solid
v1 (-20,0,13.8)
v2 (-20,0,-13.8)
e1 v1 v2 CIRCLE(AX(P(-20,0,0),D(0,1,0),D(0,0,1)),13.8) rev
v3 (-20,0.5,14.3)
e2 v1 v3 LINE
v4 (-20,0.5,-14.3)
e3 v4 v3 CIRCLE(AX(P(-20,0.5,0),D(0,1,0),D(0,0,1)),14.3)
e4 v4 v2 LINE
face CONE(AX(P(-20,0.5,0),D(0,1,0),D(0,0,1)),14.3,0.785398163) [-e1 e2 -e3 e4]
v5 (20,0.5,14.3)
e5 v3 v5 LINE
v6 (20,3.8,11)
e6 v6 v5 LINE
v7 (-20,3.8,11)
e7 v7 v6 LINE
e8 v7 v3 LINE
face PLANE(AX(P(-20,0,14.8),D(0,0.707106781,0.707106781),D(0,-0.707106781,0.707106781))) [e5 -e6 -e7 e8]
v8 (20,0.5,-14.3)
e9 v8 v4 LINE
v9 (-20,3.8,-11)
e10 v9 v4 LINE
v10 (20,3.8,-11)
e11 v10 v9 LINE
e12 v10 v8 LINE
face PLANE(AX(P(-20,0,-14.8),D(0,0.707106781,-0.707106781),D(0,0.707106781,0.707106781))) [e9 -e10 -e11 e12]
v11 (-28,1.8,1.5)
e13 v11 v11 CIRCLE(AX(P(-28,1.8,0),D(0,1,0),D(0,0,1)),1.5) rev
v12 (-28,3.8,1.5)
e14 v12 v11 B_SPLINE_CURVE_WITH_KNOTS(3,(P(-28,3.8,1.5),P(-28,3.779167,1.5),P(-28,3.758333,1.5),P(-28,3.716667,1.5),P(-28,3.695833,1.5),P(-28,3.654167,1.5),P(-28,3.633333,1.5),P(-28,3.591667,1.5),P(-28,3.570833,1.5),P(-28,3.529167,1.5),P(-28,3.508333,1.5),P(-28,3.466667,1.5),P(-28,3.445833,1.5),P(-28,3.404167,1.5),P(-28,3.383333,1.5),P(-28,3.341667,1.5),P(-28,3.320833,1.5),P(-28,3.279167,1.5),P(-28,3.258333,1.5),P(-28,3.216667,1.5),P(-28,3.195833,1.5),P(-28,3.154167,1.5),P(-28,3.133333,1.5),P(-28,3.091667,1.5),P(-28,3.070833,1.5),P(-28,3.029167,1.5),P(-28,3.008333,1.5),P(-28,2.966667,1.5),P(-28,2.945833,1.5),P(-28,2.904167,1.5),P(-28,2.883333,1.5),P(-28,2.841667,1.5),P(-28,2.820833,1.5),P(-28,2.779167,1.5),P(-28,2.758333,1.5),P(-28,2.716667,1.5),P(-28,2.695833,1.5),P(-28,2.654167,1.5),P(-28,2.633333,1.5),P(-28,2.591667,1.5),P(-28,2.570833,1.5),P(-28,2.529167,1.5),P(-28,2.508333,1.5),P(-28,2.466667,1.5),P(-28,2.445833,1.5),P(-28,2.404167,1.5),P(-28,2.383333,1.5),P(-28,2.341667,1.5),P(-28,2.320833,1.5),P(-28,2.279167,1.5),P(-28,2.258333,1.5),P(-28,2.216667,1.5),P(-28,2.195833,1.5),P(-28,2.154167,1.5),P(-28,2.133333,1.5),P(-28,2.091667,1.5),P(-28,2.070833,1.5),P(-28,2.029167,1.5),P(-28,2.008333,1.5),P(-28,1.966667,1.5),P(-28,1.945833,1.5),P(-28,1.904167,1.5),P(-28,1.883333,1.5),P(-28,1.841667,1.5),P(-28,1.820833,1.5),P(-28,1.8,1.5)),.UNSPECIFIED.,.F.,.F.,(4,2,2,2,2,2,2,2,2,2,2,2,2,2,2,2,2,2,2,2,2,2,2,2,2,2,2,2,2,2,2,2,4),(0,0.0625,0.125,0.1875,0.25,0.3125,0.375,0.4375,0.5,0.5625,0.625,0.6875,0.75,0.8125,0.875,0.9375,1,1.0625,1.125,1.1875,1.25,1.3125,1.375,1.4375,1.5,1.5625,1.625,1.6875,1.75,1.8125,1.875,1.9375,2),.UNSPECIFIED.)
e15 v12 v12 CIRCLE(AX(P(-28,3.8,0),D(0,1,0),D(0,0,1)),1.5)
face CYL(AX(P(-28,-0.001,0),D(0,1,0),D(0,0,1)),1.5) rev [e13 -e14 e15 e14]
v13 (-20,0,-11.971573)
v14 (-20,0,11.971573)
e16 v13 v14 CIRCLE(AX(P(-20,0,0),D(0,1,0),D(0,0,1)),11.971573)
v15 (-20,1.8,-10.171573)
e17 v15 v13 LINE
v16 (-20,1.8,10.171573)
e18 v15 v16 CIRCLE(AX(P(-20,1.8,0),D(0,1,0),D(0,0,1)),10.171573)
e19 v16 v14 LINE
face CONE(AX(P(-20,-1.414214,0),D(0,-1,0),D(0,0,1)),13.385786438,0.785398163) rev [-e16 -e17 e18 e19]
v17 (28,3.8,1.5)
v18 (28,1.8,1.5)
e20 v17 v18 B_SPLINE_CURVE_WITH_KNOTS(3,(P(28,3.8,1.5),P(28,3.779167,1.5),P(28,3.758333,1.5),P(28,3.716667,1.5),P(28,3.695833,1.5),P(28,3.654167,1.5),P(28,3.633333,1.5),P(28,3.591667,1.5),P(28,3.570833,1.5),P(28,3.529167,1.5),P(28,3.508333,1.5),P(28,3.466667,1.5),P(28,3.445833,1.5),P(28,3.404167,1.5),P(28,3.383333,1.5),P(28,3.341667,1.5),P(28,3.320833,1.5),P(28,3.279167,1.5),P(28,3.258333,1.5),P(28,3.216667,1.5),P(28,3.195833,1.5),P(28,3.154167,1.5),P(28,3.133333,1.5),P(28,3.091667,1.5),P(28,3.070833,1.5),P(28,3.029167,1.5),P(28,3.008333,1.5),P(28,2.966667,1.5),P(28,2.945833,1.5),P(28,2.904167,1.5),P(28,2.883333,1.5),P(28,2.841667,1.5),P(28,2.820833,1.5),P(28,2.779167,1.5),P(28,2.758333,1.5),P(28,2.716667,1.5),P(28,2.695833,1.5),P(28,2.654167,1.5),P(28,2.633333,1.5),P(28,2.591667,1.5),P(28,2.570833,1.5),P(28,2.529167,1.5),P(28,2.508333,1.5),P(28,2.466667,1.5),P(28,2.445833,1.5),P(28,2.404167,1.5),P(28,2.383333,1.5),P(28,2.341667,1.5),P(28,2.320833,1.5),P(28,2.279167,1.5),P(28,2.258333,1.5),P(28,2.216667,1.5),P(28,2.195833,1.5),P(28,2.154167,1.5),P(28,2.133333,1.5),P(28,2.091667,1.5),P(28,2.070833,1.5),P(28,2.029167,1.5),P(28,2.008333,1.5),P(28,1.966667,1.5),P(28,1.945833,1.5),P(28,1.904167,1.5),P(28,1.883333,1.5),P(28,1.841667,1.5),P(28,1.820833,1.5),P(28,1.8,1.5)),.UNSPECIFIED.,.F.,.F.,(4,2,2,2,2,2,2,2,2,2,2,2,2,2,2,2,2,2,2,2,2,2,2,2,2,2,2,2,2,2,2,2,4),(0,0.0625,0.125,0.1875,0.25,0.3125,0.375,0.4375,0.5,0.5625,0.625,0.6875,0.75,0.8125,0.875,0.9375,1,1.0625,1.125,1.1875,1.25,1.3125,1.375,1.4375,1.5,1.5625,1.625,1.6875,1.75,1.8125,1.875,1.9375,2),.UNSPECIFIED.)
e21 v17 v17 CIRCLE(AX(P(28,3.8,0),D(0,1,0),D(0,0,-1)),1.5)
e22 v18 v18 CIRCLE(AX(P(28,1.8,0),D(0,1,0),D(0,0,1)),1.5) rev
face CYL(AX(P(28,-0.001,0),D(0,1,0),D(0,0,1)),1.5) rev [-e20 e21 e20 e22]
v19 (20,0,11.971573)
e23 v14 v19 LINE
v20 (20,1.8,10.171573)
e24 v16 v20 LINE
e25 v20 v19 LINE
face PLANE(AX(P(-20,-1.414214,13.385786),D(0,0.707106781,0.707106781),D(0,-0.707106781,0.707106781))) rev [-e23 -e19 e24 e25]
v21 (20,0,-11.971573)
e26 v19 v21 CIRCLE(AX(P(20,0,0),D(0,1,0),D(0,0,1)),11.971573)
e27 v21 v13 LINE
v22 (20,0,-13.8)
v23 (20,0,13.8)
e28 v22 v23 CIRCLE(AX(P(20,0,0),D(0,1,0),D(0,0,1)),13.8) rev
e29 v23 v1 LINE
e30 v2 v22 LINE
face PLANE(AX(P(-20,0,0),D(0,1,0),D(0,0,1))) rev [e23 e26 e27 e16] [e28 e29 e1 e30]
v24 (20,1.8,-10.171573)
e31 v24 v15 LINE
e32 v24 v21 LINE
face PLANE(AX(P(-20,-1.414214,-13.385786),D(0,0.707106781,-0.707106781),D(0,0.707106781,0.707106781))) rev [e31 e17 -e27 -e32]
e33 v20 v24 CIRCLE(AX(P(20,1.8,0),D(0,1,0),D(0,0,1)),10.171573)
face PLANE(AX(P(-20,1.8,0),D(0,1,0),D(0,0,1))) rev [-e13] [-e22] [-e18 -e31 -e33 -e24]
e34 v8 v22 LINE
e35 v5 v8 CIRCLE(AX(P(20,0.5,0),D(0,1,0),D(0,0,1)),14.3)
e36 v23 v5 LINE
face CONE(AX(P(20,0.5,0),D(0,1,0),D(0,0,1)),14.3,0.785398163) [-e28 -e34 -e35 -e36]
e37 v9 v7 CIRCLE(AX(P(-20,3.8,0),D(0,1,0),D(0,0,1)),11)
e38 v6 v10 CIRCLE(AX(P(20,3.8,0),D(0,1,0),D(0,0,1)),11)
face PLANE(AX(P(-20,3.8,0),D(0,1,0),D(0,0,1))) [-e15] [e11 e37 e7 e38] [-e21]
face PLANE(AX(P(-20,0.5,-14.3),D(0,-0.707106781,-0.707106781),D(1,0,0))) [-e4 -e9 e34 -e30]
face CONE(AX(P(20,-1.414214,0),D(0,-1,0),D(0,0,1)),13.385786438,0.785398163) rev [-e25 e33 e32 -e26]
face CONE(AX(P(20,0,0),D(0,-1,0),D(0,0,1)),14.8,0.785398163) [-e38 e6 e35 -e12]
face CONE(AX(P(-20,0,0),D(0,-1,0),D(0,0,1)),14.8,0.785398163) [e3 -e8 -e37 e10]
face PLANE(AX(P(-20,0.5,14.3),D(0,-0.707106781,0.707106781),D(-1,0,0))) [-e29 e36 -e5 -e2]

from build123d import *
from OCP.BRepFilletAPI import BRepFilletAPI_MakeChamfer

# Parameters (mm, degrees)
BOSS_EXTRU_1_DEPTH      = 3.8
BOSS_EXTRU_1_TAPER      = 45
COQUE2_DEPTH            = 1.8
COQUE2_DRAFT            = 45
CHANFREIN1_SIZE         = 1
CHANFREIN1_SIZE2        = 0.707106781
ENL_V_MAT_EXTRU_1_REACH = 39.355
ESQUISSE2_R             = 1.5


# Read off the part's stored shape, not the designer's step: Coque2
with BuildPart() as part:
    # Esquisse1 → Boss.-Extru.1 (new body)
    with BuildSketch(Plane(origin=(0, 0, 0), x_dir=(1, 0, 0), z_dir=(0, 1, 0))):
        with BuildLine():
            ThreePointArc((-20, 14.8), (-34.8, 0), (-20, -14.8))
            Line((-20, -14.8), (20, -14.8))
            ThreePointArc((20, -14.8), (34.8, 0), (20, 14.8))
            Line((20, 14.8), (-20, 14.8))
        make_face()
    extrude(amount=BOSS_EXTRU_1_DEPTH, taper=BOSS_EXTRU_1_TAPER)


with BuildPart() as coque2_tool:
    # Coque2 outline → Coque2 (with draft: the straight prism first)
    with BuildSketch(Plane(origin=(0, 1.8, 0), x_dir=(1, 0, 0), z_dir=(0, 1, 0))):
        with BuildLine():
            Line((-20, -10.171572875), (20, -10.171572875))
            ThreePointArc((20, -10.171572875), (30.171572875, 0), (20, 10.171572875))
            Line((20, 10.171572875), (-20, 10.171572875))
            ThreePointArc((-20, 10.171572875), (-30.171572875, 0), (-20, -10.171572875))
        make_face()
    extrude(amount=-COQUE2_DEPTH)
    # Coque2: the draft: its side faces are tilted about the plane it starts from
    coque2_sides = [coque2_tool.faces().sort_by_distance(p)[0] for p in [
        (0, 0.9, 10.171572875),
        (30.171572875, 0.9, 0),
        (0, 0.9, -10.171572875),
        (-30.171572875, 0.9, 0),
    ]]
    draft(coque2_sides, Plane(origin=(0, 1.8, 0), x_dir=(1, 0, 0), z_dir=(0, 1, 0)), COQUE2_DRAFT)


with BuildPart() as part_1:
    add(part.part)

    # Coque2: cut by coque2_tool
    add(coque2_tool.part, mode=Mode.SUBTRACT)

    # Chanfrein1: one chamfer whose edges measure the first distance from different faces: ONE call of the kernel's chamfer builder (chamfer() names one face for all edges)
    chanfrein1_edges_1 = [part_1.edges().sort_by_distance(p)[0] for p in [
        (0, 0, -14.8),
        (0, 0, 14.8),
        (-34.8, 0, 0),
    ]]
    chanfrein1_side_1 = [part_1.faces().sort_by_distance(p)[0] for p in [
        (0, 0, -14.043672029),
    ]]
    chanfrein1_edges_2 = [part_1.edges().sort_by_distance(p)[0] for p in [
        (34.8, 0, 0),
    ]]
    chanfrein1_side_2 = [part_1.faces().sort_by_distance(p)[0] for p in [
        (32.9, 1.9, 0),
    ]]
    chanfrein1 = BRepFilletAPI_MakeChamfer(part_1.part.solid().wrapped)
    for e in chanfrein1_edges_1:
        chanfrein1.Add(CHANFREIN1_SIZE, CHANFREIN1_SIZE2, e.wrapped, chanfrein1_side_1[0].wrapped)  # the first distance lies on this face
    for e in chanfrein1_edges_2:
        chanfrein1.Add(CHANFREIN1_SIZE, CHANFREIN1_SIZE2, e.wrapped, chanfrein1_side_2[0].wrapped)  # the first distance lies on this face
    add(Compound.cast(chanfrein1.Shape()), mode=Mode.REPLACE)

    # Esquisse2 → Enlèv. mat.-Extru.1 (cut, up to next)
    with BuildSketch(Plane(origin=(0, 3.8, 0), x_dir=(1, 0, 0), z_dir=(0, 1, 0)), mode=Mode.PRIVATE) as enl_v_mat_extru_1_sk1:
        with Locations(Location((-28, 0, 0), (0, 0, 270))):
            Circle(ESQUISSE2_R)
    enl_v_mat_extru_1_tool1 = extrude(enl_v_mat_extru_1_sk1.sketch, amount=-ENL_V_MAT_EXTRU_1_REACH, mode=Mode.PRIVATE) & part_1.part
    # Esquisse2 → Enlèv. mat.-Extru.1 (cut, up to next)
    with BuildSketch(Plane(origin=(0, 3.8, 0), x_dir=(1, 0, 0), z_dir=(0, 1, 0)), mode=Mode.PRIVATE) as enl_v_mat_extru_1_sk2:
        with Locations(Location((28, 0, 0), (0, 0, 270))):
            Circle(ESQUISSE2_R)
    enl_v_mat_extru_1_tool2 = extrude(enl_v_mat_extru_1_sk2.sketch, amount=-ENL_V_MAT_EXTRU_1_REACH, mode=Mode.PRIVATE) & part_1.part
    add(enl_v_mat_extru_1_tool1.solids().sort_by_distance((-28, 3.8, 0))[0], mode=Mode.SUBTRACT)
    add(enl_v_mat_extru_1_tool2.solids().sort_by_distance((28, 3.8, 0))[0], mode=Mode.SUBTRACT)


solid = part_1.part
